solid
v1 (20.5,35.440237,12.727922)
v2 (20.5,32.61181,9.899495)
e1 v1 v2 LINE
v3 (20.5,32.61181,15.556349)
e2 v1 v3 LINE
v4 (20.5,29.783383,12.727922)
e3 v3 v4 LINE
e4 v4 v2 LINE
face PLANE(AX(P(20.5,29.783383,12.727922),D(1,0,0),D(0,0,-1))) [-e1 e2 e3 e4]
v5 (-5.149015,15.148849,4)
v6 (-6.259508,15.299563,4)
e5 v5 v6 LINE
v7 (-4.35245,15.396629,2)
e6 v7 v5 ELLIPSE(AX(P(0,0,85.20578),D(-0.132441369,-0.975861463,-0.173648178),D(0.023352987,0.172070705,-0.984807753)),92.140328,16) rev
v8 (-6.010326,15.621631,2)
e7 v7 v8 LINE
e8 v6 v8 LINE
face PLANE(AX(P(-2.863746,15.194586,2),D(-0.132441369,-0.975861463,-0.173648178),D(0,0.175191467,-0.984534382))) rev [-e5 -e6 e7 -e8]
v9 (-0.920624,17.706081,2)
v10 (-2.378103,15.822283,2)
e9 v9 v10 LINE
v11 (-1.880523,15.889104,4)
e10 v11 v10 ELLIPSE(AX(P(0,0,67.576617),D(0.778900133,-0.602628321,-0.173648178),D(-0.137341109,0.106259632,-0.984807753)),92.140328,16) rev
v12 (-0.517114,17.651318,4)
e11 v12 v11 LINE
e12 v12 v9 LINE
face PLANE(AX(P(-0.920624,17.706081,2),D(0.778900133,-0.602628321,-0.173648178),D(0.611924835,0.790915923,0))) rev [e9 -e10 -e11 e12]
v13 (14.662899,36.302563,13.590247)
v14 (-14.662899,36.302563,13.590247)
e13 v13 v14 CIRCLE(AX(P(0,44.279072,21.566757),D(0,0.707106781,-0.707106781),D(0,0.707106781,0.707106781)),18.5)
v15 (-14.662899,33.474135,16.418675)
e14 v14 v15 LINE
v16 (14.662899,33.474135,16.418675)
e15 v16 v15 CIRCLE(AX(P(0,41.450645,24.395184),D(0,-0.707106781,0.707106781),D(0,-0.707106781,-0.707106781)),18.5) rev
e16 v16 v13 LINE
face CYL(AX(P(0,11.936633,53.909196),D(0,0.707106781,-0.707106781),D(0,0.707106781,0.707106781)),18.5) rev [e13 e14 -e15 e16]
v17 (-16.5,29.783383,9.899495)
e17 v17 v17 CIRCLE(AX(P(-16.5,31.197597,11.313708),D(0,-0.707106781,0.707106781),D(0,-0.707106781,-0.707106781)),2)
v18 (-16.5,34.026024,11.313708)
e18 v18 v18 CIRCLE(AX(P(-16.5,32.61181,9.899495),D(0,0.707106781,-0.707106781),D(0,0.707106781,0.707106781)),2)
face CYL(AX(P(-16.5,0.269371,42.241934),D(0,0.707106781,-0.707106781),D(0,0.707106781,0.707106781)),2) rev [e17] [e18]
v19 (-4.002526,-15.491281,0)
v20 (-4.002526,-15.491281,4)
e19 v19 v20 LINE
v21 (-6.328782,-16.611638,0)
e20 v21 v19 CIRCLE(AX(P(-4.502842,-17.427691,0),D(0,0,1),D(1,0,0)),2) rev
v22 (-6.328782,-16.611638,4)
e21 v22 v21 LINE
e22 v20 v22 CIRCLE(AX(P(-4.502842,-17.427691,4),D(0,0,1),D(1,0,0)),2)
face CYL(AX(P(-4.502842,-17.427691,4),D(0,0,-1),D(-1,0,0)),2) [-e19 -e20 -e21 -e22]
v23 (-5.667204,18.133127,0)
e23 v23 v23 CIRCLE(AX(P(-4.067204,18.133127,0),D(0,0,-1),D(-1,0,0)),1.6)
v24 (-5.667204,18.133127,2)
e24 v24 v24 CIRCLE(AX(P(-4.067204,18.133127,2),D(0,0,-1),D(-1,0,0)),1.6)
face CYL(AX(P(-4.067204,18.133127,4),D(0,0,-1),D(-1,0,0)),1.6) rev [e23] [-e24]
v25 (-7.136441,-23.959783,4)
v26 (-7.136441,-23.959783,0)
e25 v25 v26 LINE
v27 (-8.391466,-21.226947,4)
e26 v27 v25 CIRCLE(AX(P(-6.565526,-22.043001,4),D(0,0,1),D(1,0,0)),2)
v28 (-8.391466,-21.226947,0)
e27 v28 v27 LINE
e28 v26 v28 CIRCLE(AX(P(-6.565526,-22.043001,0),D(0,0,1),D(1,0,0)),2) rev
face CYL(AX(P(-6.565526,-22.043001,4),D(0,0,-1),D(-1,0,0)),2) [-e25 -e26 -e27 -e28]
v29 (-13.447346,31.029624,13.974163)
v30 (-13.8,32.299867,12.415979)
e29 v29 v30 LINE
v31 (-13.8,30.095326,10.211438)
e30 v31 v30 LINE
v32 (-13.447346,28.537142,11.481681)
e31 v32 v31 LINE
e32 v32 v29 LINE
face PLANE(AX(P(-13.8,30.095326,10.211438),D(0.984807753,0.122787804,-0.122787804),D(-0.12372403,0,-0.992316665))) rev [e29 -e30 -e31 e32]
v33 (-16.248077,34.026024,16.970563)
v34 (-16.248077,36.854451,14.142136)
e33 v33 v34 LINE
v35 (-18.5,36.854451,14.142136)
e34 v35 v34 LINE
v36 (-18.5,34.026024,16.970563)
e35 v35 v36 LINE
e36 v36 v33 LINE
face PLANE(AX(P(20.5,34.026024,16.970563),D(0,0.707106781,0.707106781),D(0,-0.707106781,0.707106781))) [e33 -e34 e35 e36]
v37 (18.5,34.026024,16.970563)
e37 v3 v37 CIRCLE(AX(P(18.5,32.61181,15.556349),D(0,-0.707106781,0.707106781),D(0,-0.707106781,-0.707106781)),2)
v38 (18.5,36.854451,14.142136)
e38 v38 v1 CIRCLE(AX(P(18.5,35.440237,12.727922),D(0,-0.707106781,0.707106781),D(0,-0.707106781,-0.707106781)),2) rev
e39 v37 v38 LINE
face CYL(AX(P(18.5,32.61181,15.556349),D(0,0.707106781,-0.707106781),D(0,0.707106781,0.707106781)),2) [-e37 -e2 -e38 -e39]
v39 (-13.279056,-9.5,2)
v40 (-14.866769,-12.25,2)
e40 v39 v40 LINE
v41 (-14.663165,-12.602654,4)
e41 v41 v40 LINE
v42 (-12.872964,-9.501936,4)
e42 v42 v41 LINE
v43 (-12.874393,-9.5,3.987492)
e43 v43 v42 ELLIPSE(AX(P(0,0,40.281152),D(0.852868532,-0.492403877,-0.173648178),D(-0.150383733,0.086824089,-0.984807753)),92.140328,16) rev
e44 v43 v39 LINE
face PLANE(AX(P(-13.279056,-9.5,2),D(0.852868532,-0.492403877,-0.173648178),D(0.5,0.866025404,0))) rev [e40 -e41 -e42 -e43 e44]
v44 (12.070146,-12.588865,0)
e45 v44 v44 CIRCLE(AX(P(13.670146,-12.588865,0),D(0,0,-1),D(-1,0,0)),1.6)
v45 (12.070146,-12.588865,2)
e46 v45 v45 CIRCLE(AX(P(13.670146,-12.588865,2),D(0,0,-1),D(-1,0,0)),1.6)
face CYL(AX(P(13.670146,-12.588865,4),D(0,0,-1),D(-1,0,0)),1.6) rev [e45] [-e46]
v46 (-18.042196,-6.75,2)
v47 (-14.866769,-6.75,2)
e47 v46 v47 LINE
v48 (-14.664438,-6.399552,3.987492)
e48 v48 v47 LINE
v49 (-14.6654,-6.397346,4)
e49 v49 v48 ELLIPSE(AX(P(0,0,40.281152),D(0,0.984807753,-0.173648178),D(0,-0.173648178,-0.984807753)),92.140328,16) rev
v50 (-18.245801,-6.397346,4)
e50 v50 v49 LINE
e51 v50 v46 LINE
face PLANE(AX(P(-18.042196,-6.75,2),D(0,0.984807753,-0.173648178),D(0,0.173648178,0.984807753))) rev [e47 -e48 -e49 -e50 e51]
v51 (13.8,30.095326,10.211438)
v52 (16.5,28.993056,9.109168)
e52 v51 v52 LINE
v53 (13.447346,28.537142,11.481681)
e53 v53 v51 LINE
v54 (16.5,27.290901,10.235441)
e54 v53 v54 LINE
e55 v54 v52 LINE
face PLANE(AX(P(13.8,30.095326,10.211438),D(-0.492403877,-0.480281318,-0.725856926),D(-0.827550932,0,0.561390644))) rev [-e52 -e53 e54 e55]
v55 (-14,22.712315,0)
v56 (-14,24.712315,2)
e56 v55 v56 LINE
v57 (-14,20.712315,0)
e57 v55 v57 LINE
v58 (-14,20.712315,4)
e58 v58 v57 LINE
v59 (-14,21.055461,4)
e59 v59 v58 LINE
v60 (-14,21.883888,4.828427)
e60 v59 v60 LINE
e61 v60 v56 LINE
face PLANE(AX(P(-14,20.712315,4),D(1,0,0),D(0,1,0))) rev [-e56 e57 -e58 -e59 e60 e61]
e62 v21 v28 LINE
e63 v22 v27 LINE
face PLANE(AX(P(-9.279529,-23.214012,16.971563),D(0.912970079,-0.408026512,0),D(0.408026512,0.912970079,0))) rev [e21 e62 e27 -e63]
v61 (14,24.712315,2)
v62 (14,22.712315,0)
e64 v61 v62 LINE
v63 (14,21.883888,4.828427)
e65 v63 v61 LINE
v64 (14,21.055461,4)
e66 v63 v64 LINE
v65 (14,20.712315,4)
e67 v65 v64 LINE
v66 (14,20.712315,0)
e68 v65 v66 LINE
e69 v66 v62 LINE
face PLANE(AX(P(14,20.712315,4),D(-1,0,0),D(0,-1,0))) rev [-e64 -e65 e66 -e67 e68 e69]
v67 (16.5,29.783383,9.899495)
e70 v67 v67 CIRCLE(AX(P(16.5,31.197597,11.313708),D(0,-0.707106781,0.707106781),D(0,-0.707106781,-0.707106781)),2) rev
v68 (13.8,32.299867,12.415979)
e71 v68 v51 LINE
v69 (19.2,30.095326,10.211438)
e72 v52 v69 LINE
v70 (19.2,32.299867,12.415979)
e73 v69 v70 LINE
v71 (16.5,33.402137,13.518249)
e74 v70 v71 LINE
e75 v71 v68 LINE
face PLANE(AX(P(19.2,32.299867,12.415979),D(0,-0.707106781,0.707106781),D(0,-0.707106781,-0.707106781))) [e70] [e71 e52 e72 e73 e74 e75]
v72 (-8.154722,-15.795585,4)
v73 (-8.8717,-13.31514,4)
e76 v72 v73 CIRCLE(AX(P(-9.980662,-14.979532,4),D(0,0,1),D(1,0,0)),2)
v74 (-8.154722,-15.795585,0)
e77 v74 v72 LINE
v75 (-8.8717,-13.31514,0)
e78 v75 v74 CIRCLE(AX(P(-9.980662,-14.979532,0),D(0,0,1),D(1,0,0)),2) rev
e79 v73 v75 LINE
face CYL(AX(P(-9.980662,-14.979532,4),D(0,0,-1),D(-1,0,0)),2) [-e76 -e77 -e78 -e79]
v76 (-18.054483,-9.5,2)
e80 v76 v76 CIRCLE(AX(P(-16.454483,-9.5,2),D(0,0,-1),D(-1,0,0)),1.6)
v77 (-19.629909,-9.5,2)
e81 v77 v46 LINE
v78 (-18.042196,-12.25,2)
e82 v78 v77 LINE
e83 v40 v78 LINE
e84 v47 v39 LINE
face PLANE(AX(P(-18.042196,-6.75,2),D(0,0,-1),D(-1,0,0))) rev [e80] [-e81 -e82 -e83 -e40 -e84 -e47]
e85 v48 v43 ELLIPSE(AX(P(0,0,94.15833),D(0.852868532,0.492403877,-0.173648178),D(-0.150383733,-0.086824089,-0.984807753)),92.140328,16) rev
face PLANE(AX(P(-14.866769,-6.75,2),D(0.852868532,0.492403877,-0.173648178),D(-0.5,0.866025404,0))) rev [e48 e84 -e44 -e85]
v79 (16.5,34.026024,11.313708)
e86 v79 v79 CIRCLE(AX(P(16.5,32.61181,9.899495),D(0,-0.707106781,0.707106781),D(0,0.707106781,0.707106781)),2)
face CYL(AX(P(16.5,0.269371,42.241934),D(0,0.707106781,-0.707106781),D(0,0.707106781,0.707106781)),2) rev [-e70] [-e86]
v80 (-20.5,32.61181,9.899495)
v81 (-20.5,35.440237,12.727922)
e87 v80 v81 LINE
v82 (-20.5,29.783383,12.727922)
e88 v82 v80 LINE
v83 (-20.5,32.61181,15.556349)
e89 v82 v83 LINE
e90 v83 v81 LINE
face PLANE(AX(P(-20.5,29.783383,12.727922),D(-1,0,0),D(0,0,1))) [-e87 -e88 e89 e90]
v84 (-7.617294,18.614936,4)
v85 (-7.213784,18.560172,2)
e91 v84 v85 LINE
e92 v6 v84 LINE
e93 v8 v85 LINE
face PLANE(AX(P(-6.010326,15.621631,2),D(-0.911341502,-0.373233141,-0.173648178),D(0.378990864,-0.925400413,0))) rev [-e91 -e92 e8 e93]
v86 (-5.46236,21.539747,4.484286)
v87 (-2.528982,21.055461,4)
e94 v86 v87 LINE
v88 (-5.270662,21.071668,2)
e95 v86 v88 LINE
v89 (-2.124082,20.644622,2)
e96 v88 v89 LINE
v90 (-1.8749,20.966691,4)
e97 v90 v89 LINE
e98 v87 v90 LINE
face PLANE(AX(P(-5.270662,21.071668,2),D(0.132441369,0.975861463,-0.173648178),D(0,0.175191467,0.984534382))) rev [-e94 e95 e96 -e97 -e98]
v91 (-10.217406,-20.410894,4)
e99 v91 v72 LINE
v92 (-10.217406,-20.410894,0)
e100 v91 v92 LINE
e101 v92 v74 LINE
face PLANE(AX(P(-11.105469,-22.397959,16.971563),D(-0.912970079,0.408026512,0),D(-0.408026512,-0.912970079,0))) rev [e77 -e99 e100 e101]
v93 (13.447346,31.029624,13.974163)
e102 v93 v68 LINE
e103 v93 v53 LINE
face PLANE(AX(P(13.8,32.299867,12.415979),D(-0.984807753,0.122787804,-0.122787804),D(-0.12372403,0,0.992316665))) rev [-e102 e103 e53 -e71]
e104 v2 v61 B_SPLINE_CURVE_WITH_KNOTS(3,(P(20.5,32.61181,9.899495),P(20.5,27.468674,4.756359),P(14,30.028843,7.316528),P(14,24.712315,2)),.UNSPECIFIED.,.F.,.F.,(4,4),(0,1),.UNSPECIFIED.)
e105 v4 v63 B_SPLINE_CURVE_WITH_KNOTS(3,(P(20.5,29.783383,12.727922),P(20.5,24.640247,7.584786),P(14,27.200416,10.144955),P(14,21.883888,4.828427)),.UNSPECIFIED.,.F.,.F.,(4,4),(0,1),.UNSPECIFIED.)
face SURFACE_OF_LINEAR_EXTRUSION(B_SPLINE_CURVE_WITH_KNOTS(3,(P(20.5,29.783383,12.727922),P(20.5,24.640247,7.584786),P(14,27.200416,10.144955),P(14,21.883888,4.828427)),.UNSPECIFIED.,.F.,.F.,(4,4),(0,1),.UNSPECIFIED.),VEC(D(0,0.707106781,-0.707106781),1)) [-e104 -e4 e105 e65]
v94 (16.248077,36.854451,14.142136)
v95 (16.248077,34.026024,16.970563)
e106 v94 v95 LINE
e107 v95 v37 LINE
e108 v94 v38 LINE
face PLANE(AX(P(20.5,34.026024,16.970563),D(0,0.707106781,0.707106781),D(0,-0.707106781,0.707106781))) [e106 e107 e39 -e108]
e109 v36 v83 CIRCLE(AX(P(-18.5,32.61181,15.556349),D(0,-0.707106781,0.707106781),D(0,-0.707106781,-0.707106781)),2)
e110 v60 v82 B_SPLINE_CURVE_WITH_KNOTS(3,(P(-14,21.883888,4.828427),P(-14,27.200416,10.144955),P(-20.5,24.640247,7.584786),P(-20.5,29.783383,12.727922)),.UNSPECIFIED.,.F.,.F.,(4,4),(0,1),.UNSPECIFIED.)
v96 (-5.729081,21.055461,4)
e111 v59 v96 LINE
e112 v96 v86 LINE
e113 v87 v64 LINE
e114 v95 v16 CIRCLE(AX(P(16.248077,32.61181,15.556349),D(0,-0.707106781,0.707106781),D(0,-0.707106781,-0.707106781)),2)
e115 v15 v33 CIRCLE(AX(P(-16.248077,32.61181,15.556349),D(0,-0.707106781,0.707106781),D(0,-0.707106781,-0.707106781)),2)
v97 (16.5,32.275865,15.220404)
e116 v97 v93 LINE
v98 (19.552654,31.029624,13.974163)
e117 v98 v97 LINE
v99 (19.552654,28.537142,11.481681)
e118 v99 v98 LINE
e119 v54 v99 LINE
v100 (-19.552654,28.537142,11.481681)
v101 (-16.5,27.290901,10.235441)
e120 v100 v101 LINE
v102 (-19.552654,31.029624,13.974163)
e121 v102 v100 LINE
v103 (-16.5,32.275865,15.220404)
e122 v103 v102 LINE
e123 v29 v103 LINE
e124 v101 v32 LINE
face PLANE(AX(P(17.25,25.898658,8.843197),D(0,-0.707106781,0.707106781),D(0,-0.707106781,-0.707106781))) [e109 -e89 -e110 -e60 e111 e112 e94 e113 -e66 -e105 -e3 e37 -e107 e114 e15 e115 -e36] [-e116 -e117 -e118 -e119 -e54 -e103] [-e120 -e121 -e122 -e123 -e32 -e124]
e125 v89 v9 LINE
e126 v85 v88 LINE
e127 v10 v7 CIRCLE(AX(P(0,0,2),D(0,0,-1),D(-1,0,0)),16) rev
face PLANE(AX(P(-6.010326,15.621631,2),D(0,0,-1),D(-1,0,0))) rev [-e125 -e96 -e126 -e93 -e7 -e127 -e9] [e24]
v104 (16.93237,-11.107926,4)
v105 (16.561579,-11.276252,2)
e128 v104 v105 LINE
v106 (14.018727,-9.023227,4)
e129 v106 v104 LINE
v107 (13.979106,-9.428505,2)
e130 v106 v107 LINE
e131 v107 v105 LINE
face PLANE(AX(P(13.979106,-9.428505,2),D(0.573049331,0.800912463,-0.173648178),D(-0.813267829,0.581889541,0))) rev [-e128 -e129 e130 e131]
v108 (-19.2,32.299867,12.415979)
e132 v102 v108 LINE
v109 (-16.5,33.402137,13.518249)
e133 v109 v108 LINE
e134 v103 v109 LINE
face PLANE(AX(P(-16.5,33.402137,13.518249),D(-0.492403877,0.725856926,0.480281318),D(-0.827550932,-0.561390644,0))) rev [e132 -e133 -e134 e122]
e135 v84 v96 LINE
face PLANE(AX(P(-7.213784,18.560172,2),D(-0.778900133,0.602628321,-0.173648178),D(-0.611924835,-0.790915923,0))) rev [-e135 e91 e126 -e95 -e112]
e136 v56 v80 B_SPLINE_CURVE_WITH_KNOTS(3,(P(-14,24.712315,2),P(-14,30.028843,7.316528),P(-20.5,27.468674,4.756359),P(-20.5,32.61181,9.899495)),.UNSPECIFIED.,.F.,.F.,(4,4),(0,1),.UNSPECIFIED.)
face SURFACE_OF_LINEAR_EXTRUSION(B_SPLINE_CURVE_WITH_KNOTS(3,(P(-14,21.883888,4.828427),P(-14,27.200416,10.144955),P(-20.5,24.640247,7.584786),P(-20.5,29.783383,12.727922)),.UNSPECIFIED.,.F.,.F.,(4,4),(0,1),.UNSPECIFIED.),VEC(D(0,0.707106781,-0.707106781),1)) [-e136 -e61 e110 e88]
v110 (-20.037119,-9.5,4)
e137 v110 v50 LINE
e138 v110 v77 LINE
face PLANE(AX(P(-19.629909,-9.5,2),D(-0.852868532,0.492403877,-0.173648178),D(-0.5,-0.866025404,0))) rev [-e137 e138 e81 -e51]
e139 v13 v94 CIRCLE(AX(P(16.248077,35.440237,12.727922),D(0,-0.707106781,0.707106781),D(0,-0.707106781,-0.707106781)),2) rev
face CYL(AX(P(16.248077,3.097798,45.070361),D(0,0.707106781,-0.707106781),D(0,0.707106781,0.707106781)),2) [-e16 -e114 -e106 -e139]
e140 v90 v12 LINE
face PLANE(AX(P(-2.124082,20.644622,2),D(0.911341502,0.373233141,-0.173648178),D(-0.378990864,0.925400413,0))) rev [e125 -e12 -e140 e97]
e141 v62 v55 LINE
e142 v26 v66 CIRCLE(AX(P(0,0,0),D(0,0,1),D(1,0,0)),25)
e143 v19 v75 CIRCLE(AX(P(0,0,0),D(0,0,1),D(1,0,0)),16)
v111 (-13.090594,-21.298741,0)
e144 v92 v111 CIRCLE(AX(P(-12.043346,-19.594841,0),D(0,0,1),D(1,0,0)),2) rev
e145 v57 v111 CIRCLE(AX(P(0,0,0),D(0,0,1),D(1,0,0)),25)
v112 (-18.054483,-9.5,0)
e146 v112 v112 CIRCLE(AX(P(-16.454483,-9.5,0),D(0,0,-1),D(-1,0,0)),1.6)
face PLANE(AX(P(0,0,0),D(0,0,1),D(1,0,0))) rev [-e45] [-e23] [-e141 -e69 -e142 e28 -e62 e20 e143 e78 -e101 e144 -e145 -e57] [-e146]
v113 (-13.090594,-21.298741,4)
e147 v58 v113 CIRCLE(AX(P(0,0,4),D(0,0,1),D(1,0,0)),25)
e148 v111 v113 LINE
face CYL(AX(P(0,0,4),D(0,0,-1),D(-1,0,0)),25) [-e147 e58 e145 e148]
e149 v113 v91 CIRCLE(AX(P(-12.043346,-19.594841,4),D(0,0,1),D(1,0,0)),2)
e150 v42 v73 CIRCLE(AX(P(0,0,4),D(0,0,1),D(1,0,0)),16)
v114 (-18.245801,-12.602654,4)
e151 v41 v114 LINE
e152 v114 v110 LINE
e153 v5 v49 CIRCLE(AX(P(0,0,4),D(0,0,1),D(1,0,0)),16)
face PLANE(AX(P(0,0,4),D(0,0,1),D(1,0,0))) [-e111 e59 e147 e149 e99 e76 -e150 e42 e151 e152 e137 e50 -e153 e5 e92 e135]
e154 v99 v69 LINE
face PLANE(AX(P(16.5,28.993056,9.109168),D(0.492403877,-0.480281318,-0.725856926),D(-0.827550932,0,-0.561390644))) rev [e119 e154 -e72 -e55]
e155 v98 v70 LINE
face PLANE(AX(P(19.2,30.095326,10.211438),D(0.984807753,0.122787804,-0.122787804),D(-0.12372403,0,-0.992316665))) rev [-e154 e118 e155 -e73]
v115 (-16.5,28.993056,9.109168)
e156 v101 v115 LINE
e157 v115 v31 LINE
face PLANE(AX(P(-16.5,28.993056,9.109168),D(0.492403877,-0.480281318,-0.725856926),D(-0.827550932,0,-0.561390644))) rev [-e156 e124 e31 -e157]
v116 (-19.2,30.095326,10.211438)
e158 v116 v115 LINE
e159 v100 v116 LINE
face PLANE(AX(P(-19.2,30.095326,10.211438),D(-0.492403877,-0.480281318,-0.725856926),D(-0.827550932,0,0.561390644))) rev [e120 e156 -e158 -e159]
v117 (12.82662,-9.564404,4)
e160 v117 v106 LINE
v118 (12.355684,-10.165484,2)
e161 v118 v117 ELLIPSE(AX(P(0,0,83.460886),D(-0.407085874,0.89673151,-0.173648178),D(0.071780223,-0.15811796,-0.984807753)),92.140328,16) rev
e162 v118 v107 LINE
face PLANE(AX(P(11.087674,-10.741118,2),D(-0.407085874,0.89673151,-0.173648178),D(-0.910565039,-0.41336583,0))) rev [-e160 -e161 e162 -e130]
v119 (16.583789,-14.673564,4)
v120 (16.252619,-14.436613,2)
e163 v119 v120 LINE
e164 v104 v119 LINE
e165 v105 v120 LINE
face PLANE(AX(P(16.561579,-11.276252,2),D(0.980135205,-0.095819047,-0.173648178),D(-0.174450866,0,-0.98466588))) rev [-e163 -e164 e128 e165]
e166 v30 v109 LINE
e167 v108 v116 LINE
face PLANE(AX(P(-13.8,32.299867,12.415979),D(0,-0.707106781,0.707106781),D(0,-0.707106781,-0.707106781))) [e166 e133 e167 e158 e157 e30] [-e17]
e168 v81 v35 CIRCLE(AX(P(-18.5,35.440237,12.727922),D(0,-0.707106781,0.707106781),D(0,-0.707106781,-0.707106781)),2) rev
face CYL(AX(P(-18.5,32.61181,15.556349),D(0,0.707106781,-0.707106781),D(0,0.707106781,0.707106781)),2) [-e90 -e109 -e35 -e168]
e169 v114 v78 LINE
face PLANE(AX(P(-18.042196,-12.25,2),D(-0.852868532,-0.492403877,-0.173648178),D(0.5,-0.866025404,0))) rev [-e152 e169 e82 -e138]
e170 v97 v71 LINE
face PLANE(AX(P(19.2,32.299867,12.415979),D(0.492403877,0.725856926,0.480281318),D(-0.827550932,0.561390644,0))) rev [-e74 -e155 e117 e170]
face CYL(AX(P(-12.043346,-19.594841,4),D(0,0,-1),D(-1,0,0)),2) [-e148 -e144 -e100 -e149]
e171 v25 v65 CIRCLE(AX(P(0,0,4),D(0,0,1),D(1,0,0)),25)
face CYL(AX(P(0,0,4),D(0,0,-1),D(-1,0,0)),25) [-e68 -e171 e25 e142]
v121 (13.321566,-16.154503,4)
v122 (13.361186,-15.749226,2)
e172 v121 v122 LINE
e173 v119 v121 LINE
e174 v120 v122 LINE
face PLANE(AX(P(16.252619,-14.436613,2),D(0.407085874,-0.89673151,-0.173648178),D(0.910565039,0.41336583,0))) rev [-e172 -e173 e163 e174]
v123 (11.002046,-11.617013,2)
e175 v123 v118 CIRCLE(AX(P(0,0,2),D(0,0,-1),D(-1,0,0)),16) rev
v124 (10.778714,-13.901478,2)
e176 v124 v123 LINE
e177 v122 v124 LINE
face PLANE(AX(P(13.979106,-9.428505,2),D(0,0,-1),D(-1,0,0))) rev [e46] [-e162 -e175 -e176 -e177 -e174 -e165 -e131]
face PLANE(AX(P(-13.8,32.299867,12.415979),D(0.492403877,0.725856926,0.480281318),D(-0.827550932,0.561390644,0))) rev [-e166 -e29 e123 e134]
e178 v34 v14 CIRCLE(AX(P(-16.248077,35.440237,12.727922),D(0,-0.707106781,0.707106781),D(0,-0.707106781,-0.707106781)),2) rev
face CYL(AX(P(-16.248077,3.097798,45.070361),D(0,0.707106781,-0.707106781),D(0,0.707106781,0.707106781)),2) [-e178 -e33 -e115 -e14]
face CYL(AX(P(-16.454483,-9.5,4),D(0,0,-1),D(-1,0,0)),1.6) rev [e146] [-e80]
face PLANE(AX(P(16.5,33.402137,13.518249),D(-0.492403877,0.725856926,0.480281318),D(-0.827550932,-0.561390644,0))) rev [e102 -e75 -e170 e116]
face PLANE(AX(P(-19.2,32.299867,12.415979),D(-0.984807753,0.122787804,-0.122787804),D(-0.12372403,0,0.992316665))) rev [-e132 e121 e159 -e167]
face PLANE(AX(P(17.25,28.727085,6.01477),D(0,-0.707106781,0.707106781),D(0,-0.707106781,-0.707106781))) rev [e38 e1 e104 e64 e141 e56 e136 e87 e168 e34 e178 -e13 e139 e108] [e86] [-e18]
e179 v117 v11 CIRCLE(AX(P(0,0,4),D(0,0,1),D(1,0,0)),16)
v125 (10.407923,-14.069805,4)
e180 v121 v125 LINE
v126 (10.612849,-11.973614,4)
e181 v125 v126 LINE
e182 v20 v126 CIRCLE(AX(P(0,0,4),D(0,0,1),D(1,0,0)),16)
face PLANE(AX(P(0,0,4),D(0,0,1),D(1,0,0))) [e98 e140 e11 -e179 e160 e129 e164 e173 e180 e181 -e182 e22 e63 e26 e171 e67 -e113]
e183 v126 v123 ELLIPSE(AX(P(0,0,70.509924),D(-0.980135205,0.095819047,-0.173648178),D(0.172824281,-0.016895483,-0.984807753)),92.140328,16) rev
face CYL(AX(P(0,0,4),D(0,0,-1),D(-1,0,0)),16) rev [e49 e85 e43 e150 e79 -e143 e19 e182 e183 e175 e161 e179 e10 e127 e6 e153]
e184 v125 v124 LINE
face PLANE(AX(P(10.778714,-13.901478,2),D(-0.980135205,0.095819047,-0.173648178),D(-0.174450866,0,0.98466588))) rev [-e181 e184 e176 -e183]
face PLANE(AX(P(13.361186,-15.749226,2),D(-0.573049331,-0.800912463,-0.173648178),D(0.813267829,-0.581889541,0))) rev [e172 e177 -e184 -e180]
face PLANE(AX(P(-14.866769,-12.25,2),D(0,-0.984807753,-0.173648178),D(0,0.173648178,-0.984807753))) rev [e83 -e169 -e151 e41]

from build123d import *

# Parameters (mm, degrees)
SKETCH1_R                = 25
SKETCH1_R_2              = 16
BOSS_EXTRUDE1_DEPTH      = 4
SKETCH2_R                = 1.6
CUT_EFFECTOR_HOLES_DEPTH = 36.580893749
SKETCH10_W               = 28
SKETCH10_H               = 4.287684823
CUT_EXTRUDE6_DEPTH       = 36.580893749
SKETCH3_W                = 28
SKETCH3_H                = 2
BOSS_FAN_EXTENSION_DEPTH = 4
BOSS_FAN_BOSS_DEPTH      = 4
CUT_FAN_SCREW_REACH      = 54.433
SKETCH5_R                = 2
CUT_FAN_HOLE_REACH       = 54.433
SKETCH6_R                = 18.5
FILLET1_R                = 2
CUT_EXTRUDE4_OUTLINE_R   = 1.6
CUT_EXTRUDE4_DEPTH       = 2
CUT_EXTRUDE4_DRAFT       = 10
CUT_EXTRUDE4_2_OUTLINE_R = 1.6
CUT_EXTRUDE4_2_DEPTH     = 2.484285969
CUT_EXTRUDE4_2_DRAFT     = 10
CUT_EXTRUDE4_3_OUTLINE_R = 1.6
CUT_EXTRUDE4_3_DEPTH     = 2
CUT_EXTRUDE4_3_DRAFT     = 10
CUT_EXTRUDE5_REACH       = 49.658
FILLET2_R                = 2
CUT_EXTRUDE7_DEPTH       = 2
CUT_EXTRUDE7_DRAFT       = -10
CUT_EXTRUDE7_2_DEPTH     = 2
CUT_EXTRUDE7_2_DRAFT     = -10


# Read off the part's stored shape, not the designer's step: Cut-Extrude4, Cut-Extrude7
with BuildPart() as part:
    # Sketch1 → Boss-Extrude1 (new body)
    with BuildSketch(Plane.XY):
        Circle(SKETCH1_R)
        Circle(SKETCH1_R_2, mode=Mode.SUBTRACT)
    extrude(amount=BOSS_EXTRUDE1_DEPTH)

    # Sketch2 → Cut-Effector Holes (cut, through all)
    with BuildSketch(Plane(origin=(0, 0, 0), x_dir=(-1, 0, 0), z_dir=(0, 0, -1))):
        with Locations((4.067203991, 18.133126642)):
            Circle(SKETCH2_R)
        with Locations((-13.670146326, -12.588865299)):
            Circle(SKETCH2_R)
        with Locations((16.454482672, -9.5)):
            Circle(SKETCH2_R)
    extrude(amount=-CUT_EFFECTOR_HOLES_DEPTH, mode=Mode.SUBTRACT)

    # Sketch10 → Cut-Extrude6 (cut, through all)
    with BuildSketch(Plane(origin=(0, 0, 0), x_dir=(-1, 0, 0), z_dir=(0, 0, -1))):
        with Locations((0, 22.856157589)):
            Rectangle(SKETCH10_W, SKETCH10_H)
    extrude(amount=-CUT_EXTRUDE6_DEPTH, mode=Mode.SUBTRACT)

    # Sketch3 → Boss-Fan Extension (add, through all)
    with BuildSketch(Plane.XY):
        with Locations((0, 21.712315177)):
            Rectangle(SKETCH3_W, SKETCH3_H)
    extrude(amount=BOSS_FAN_EXTENSION_DEPTH)

    # Sketch4 → Boss-Fan Boss (add)
    with BuildSketch(Plane(origin=(0, 11.356157589, -11.356157589), x_dir=(-1, 0, 0), z_dir=(0, 0.7071067811865464, -0.7071067811865488))):
        with BuildLine():
            Line((-20.5, 30.060032078), (-20.5, 36.060032078))
            Line((-20.5, 36.060032078), (20.5, 36.060032078))
            Line((20.5, 36.060032078), (20.5, 30.060032078))
            add(Edge.make_bspline(
                [(14, 18.888459203), (14, 26.407165397), (20.5, 22.786539918), (20.5, 30.060032078)],
                knots=[0, 0, 0, 0, 1, 1, 1, 1], degree=3))
            Line((14, 18.888459203), (14, 16.060032078))
            Line((14, 16.060032078), (-14, 16.060032078))
            Line((-14, 16.060032078), (-14, 18.888459203))
            add(Edge.make_bspline(
                [(-14, 18.888459203), (-14, 26.407165397), (-20.5, 22.786539918), (-20.5, 30.060032078)],
                knots=[0, 0, 0, 0, 1, 1, 1, 1], degree=3))
        make_face()
    extrude(amount=-BOSS_FAN_BOSS_DEPTH)

    # Sketch5 → Cut-Fan Screw (cut, up to next)
    with BuildSketch(Plane(origin=(0, 11.356157589, -11.356157589), x_dir=(1, 0, 0), z_dir=(0, 0.7071067811865466, -0.7071067811865485)), mode=Mode.PRIVATE) as cut_fan_screw_sk1:
        with Locations(Location((-16.5, -30.060032078, 0), (0, 0, 270))):
            Circle(SKETCH5_R)
    cut_fan_screw_tool1 = extrude(cut_fan_screw_sk1.sketch, amount=-CUT_FAN_SCREW_REACH, mode=Mode.PRIVATE) & part.part
    cut_fan_screw = cut_fan_screw_tool1.solids().sort_by_distance((-16.5, 32.61181, 9.899495))[0]
    add(cut_fan_screw, mode=Mode.SUBTRACT)

    # Mirror-Fan Screw: Cut-Fan Screw across plane
    add(cut_fan_screw.mirror(Plane(origin=(0, 0, 0), x_dir=(0, 0, 1), z_dir=(1, 0, 0))), mode=Mode.SUBTRACT)

    # Sketch6 → Cut-Fan Hole (cut, up to next)
    with BuildSketch(Plane(origin=(0, 11.356157589, -11.356157589), x_dir=(1, 0, 0), z_dir=(0, 0.7071067811865466, -0.7071067811865485)), mode=Mode.PRIVATE) as cut_fan_hole_sk1:
        with Locations((0, -46.560032078)):
            Circle(SKETCH6_R)
    cut_fan_hole_tool1 = extrude(cut_fan_hole_sk1.sketch, amount=-CUT_FAN_HOLE_REACH, mode=Mode.PRIVATE) & part.part
    add(cut_fan_hole_tool1.solids().sort_by_distance((0, 44.279072, 21.566757))[0], mode=Mode.SUBTRACT)

    # Fillet1
    fillet1_edges = [part.edges().sort_by_distance(p)[0] for p in [
        (20.5, 35.440237239, 15.556349186),
        (-20.5, 35.440237239, 15.556349186),
        (15.231546212, 35.440237239, 15.556349186),
        (-15.231546212, 35.440237239, 15.556349186),
    ]]
    fillet(fillet1_edges, radius=FILLET1_R)


with BuildPart() as cut_extrude4_tool:
    # Cut-Extrude4 outline → Cut-Extrude4 (with draft: the straight prism first)
    with BuildSketch(Plane(origin=(0, 0, 2), x_dir=(-1, 0, 0), z_dir=(0, 0, -1))):
        with BuildLine():
            ThreePointArc((-11.002045698, -11.617012975), (-11.701394046, -10.912258124), (-12.355684371, -10.165483939))
            Line((-12.355684371, -10.165483939), (-13.979106464, -9.42850504))
            Line((-13.979106464, -9.42850504), (-16.561578664, -11.276252498))
            Line((-16.561578664, -11.276252498), (-16.252618527, -14.436612757))
            Line((-16.252618527, -14.436612757), (-13.361186189, -15.749225558))
            Line((-13.361186189, -15.749225558), (-10.778713988, -13.901478101))
            Line((-10.778713988, -13.901478101), (-11.002045698, -11.617012975))
        make_face()
        with Locations((-13.670146326, -12.588865299)):
            Circle(CUT_EXTRUDE4_OUTLINE_R, mode=Mode.SUBTRACT)
    extrude(amount=-CUT_EXTRUDE4_DEPTH)
    # Cut-Extrude4: the draft: its side faces are tilted about the plane it starts from
    cut_extrude4_sides = [cut_extrude4_tool.faces().sort_by_distance(p)[0] for p in [
        (16.407098595, -12.856432627, 3),
        (14.806902358, -15.092919158, 3),
        (12.069950089, -14.825351829, 3),
        (10.890379843, -12.759245538, 3),
        (11.701394046, -10.912258124, 3),
        (13.167395417, -9.796994489, 3),
        (15.270342564, -10.352378769, 3),
        (15.270146326, -12.588865299, 3),
    ]]
    draft(cut_extrude4_sides, Plane(origin=(0, 0, 2), x_dir=(-1, 0, 0), z_dir=(0, 0, -1)), CUT_EXTRUDE4_DRAFT)


with BuildPart() as part_1:
    add(part.part)

    # Cut-Extrude4: cut by cut_extrude4_tool
    add(cut_extrude4_tool.part, mode=Mode.SUBTRACT)


with BuildPart() as cut_extrude4_2_tool:
    # Cut-Extrude4 2 outline → Cut-Extrude4 2 (with draft: the straight prism first)
    with BuildSketch(Plane(origin=(0, 0, 2), x_dir=(-1, 0, 0), z_dir=(0, 0, -1))):
        with BuildLine():
            ThreePointArc((2.378102624, 15.822282639), (3.371999625, 15.640639965), (4.352450444, 15.396628694))
            Line((4.352450444, 15.396628694), (6.010326315, 15.621631277))
            Line((6.010326315, 15.621631277), (7.21378394, 18.560172255))
            Line((7.21378394, 18.560172255), (5.270661616, 21.071667619))
            Line((5.270661616, 21.071667619), (2.124081667, 20.644622006))
            Line((2.124081667, 20.644622006), (0.920624042, 17.706081029))
            Line((0.920624042, 17.706081029), (2.378102624, 15.822282639))
        make_face()
        with Locations((4.067203991, 18.133126642)):
            Circle(CUT_EXTRUDE4_2_OUTLINE_R, mode=Mode.SUBTRACT)
    extrude(amount=-CUT_EXTRUDE4_2_DEPTH)
    # Cut-Extrude4 2: the draft: its side faces are tilted about the plane it starts from
    cut_extrude4_2_sides = [cut_extrude4_2_tool.faces().sort_by_distance(p)[0] for p in [
        (-6.242222778, 19.815919937, 3.242142985),
        (-3.697371642, 20.858144812, 3.242142985),
        (-1.522352855, 19.175351517, 3.242142985),
        (-1.649363333, 16.764181834, 3.242142985),
        (-3.371999625, 15.640639965, 3.242142985),
        (-5.18138838, 15.509129986, 3.242142985),
        (-6.612055127, 17.090901766, 3.242142985),
        (-2.467203991, 18.133126642, 3.242142985),
    ]]
    draft(cut_extrude4_2_sides, Plane(origin=(0, 0, 2), x_dir=(-1, 0, 0), z_dir=(0, 0, -1)), CUT_EXTRUDE4_2_DRAFT)


with BuildPart() as part_2:
    add(part_1.part)

    # Cut-Extrude4 2: cut by cut_extrude4_2_tool
    add(cut_extrude4_2_tool.part, mode=Mode.SUBTRACT)


with BuildPart() as cut_extrude4_3_tool:
    # Cut-Extrude4 3 outline → Cut-Extrude4 3 (with draft: the straight prism first)
    with BuildSketch(Plane(origin=(0, 0, 2), x_dir=(-1, 0, 0), z_dir=(0, 0, -1))):
        Polygon((18.042195912, -6.75), (14.866769432, -6.75), (13.279056191, -9.5), (14.866769432, -12.25), (18.042195912, -12.25), (19.629909152, -9.5), align=None)
        with Locations((16.454482672, -9.5)):
            Circle(CUT_EXTRUDE4_3_OUTLINE_R, mode=Mode.SUBTRACT)
    extrude(amount=-CUT_EXTRUDE4_3_DEPTH)
    # Cut-Extrude4 3: the draft: its side faces are tilted about the plane it starts from
    cut_extrude4_3_sides = [cut_extrude4_3_tool.faces().sort_by_distance(p)[0] for p in [
        (-16.454482672, -6.75, 3),
        (-14.072912812, -8.125, 3),
        (-14.072912812, -10.875, 3),
        (-16.454482672, -12.25, 3),
        (-18.836052532, -10.875, 3),
        (-18.836052532, -8.125, 3),
        (-14.854482672, -9.5, 3),
    ]]
    draft(cut_extrude4_3_sides, Plane(origin=(0, 0, 2), x_dir=(-1, 0, 0), z_dir=(0, 0, -1)), CUT_EXTRUDE4_3_DRAFT)


with BuildPart() as part_3:
    add(part_2.part)

    # Cut-Extrude4 3: cut by cut_extrude4_3_tool
    add(cut_extrude4_3_tool.part, mode=Mode.SUBTRACT)

    # Sketch8 → Cut-Extrude5 (cut, up to next)
    with BuildSketch(Plane(origin=(0, 0, 0), x_dir=(-1, 0, 0), z_dir=(0, 0, -1)), mode=Mode.PRIVATE) as cut_extrude5_sk1:
        with BuildLine():
            Line((9.279528916, -23.214011784), (5.602690803, -14.98698955))
            Line((5.602690803, -14.98698955), (7.428630962, -14.170936526))
            Line((7.428630962, -14.170936526), (11.105469075, -22.39795876))
            ThreePointArc((11.105469075, -22.39795876), (10.200662793, -22.824251983), (9.279528916, -23.214011784))
        make_face()
    cut_extrude5_tool1 = extrude(cut_extrude5_sk1.sketch, amount=-CUT_EXTRUDE5_REACH, mode=Mode.PRIVATE) & part_3.part
    add(cut_extrude5_tool1.solids().sort_by_distance((-8.356802, -18.698565, 0))[0], mode=Mode.SUBTRACT)

    # Fillet2
    fillet2_edges = [part_3.edges().sort_by_distance(p)[0] for p in [
        (-11.105469075, -22.39795876, 2),
        (-5.602690803, -14.98698955, 2),
        (-9.279528916, -23.214011784, 2),
        (-7.428630962, -14.170936526, 2),
    ]]
    fillet(fillet2_edges, radius=FILLET2_R)


with BuildPart() as cut_extrude7_tool:
    # Cut-Extrude7 outline → Cut-Extrude7 (with draft: the straight prism first)
    with BuildSketch(Plane(origin=(0, 9.941944026, -9.941944026), x_dir=(1, 0, 0), z_dir=(0, -0.7071067811865462, 0.7071067811865488))):
        Polygon((-13.8, 28.501186351), (-13.8, 31.618877805), (-16.5, 33.177723532), (-19.2, 31.618877805), (-19.2, 28.501186351), (-16.5, 26.942340625), align=None)
        with BuildLine():
            ThreePointArc((-16.5, 32.060032078), (-14.5, 30.060032078), (-16.5, 28.060032078))
            ThreePointArc((-16.5, 28.060032078), (-18.5, 30.060032078), (-16.5, 32.060032078))
        make_face(mode=Mode.SUBTRACT)
    extrude(amount=CUT_EXTRUDE7_DEPTH)
    # Cut-Extrude7: the draft: its side faces are tilted about the plane it starts from
    cut_extrude7_sides = [cut_extrude7_tool.faces().sort_by_distance(p)[0] for p in [
        (-13.8, 30.49048977, 12.02081528),
        (-16.5, 29.076276207, 10.606601718),
        (-17.85, 28.837084194, 10.367409704),
        (-19.2, 30.49048977, 12.02081528),
        (-17.85, 32.143895346, 13.674220857),
        (-15.15, 32.143895346, 13.674220857),
        (-15.15, 28.837084194, 10.367409704),
    ]]
    draft(cut_extrude7_sides, Plane(origin=(0, 9.941944026, -9.941944026), x_dir=(1, 0, 0), z_dir=(0, -0.7071067811865462, 0.7071067811865488)), CUT_EXTRUDE7_DRAFT)


with BuildPart() as part_4:
    add(part_3.part)

    # Cut-Extrude7: cut by cut_extrude7_tool
    add(cut_extrude7_tool.part, mode=Mode.SUBTRACT)


with BuildPart() as cut_extrude7_2_tool:
    # Cut-Extrude7 2 outline → Cut-Extrude7 2 (with draft: the straight prism first)
    with BuildSketch(Plane(origin=(0, 9.941944026, -9.941944026), x_dir=(1, 0, 0), z_dir=(0, -0.7071067811865462, 0.7071067811865488))):
        Polygon((19.2, 28.501186351), (19.2, 31.618877805), (16.5, 33.177723532), (13.8, 31.618877805), (13.8, 28.501186351), (16.5, 26.942340625), align=None)
        with BuildLine():
            ThreePointArc((16.5, 32.060032078), (18.5, 30.060032078), (16.5, 28.060032078))
            ThreePointArc((16.5, 28.060032078), (14.5, 30.060032078), (16.5, 32.060032078))
        make_face(mode=Mode.SUBTRACT)
    extrude(amount=CUT_EXTRUDE7_2_DEPTH)
    # Cut-Extrude7 2: the draft: its side faces are tilted about the plane it starts from
    cut_extrude7_2_sides = [cut_extrude7_2_tool.faces().sort_by_distance(p)[0] for p in [
        (19.2, 30.49048977, 12.02081528),
        (16.5, 29.076276207, 10.606601718),
        (15.15, 28.837084194, 10.367409704),
        (13.8, 30.49048977, 12.02081528),
        (15.15, 32.143895346, 13.674220857),
        (17.85, 32.143895346, 13.674220857),
        (17.85, 28.837084194, 10.367409704),
    ]]
    draft(cut_extrude7_2_sides, Plane(origin=(0, 9.941944026, -9.941944026), x_dir=(1, 0, 0), z_dir=(0, -0.7071067811865462, 0.7071067811865488)), CUT_EXTRUDE7_2_DRAFT)


with BuildPart() as part_5:
    add(part_4.part)

    # Cut-Extrude7 2: cut by cut_extrude7_2_tool
    add(cut_extrude7_2_tool.part, mode=Mode.SUBTRACT)


solid = part_5.part
